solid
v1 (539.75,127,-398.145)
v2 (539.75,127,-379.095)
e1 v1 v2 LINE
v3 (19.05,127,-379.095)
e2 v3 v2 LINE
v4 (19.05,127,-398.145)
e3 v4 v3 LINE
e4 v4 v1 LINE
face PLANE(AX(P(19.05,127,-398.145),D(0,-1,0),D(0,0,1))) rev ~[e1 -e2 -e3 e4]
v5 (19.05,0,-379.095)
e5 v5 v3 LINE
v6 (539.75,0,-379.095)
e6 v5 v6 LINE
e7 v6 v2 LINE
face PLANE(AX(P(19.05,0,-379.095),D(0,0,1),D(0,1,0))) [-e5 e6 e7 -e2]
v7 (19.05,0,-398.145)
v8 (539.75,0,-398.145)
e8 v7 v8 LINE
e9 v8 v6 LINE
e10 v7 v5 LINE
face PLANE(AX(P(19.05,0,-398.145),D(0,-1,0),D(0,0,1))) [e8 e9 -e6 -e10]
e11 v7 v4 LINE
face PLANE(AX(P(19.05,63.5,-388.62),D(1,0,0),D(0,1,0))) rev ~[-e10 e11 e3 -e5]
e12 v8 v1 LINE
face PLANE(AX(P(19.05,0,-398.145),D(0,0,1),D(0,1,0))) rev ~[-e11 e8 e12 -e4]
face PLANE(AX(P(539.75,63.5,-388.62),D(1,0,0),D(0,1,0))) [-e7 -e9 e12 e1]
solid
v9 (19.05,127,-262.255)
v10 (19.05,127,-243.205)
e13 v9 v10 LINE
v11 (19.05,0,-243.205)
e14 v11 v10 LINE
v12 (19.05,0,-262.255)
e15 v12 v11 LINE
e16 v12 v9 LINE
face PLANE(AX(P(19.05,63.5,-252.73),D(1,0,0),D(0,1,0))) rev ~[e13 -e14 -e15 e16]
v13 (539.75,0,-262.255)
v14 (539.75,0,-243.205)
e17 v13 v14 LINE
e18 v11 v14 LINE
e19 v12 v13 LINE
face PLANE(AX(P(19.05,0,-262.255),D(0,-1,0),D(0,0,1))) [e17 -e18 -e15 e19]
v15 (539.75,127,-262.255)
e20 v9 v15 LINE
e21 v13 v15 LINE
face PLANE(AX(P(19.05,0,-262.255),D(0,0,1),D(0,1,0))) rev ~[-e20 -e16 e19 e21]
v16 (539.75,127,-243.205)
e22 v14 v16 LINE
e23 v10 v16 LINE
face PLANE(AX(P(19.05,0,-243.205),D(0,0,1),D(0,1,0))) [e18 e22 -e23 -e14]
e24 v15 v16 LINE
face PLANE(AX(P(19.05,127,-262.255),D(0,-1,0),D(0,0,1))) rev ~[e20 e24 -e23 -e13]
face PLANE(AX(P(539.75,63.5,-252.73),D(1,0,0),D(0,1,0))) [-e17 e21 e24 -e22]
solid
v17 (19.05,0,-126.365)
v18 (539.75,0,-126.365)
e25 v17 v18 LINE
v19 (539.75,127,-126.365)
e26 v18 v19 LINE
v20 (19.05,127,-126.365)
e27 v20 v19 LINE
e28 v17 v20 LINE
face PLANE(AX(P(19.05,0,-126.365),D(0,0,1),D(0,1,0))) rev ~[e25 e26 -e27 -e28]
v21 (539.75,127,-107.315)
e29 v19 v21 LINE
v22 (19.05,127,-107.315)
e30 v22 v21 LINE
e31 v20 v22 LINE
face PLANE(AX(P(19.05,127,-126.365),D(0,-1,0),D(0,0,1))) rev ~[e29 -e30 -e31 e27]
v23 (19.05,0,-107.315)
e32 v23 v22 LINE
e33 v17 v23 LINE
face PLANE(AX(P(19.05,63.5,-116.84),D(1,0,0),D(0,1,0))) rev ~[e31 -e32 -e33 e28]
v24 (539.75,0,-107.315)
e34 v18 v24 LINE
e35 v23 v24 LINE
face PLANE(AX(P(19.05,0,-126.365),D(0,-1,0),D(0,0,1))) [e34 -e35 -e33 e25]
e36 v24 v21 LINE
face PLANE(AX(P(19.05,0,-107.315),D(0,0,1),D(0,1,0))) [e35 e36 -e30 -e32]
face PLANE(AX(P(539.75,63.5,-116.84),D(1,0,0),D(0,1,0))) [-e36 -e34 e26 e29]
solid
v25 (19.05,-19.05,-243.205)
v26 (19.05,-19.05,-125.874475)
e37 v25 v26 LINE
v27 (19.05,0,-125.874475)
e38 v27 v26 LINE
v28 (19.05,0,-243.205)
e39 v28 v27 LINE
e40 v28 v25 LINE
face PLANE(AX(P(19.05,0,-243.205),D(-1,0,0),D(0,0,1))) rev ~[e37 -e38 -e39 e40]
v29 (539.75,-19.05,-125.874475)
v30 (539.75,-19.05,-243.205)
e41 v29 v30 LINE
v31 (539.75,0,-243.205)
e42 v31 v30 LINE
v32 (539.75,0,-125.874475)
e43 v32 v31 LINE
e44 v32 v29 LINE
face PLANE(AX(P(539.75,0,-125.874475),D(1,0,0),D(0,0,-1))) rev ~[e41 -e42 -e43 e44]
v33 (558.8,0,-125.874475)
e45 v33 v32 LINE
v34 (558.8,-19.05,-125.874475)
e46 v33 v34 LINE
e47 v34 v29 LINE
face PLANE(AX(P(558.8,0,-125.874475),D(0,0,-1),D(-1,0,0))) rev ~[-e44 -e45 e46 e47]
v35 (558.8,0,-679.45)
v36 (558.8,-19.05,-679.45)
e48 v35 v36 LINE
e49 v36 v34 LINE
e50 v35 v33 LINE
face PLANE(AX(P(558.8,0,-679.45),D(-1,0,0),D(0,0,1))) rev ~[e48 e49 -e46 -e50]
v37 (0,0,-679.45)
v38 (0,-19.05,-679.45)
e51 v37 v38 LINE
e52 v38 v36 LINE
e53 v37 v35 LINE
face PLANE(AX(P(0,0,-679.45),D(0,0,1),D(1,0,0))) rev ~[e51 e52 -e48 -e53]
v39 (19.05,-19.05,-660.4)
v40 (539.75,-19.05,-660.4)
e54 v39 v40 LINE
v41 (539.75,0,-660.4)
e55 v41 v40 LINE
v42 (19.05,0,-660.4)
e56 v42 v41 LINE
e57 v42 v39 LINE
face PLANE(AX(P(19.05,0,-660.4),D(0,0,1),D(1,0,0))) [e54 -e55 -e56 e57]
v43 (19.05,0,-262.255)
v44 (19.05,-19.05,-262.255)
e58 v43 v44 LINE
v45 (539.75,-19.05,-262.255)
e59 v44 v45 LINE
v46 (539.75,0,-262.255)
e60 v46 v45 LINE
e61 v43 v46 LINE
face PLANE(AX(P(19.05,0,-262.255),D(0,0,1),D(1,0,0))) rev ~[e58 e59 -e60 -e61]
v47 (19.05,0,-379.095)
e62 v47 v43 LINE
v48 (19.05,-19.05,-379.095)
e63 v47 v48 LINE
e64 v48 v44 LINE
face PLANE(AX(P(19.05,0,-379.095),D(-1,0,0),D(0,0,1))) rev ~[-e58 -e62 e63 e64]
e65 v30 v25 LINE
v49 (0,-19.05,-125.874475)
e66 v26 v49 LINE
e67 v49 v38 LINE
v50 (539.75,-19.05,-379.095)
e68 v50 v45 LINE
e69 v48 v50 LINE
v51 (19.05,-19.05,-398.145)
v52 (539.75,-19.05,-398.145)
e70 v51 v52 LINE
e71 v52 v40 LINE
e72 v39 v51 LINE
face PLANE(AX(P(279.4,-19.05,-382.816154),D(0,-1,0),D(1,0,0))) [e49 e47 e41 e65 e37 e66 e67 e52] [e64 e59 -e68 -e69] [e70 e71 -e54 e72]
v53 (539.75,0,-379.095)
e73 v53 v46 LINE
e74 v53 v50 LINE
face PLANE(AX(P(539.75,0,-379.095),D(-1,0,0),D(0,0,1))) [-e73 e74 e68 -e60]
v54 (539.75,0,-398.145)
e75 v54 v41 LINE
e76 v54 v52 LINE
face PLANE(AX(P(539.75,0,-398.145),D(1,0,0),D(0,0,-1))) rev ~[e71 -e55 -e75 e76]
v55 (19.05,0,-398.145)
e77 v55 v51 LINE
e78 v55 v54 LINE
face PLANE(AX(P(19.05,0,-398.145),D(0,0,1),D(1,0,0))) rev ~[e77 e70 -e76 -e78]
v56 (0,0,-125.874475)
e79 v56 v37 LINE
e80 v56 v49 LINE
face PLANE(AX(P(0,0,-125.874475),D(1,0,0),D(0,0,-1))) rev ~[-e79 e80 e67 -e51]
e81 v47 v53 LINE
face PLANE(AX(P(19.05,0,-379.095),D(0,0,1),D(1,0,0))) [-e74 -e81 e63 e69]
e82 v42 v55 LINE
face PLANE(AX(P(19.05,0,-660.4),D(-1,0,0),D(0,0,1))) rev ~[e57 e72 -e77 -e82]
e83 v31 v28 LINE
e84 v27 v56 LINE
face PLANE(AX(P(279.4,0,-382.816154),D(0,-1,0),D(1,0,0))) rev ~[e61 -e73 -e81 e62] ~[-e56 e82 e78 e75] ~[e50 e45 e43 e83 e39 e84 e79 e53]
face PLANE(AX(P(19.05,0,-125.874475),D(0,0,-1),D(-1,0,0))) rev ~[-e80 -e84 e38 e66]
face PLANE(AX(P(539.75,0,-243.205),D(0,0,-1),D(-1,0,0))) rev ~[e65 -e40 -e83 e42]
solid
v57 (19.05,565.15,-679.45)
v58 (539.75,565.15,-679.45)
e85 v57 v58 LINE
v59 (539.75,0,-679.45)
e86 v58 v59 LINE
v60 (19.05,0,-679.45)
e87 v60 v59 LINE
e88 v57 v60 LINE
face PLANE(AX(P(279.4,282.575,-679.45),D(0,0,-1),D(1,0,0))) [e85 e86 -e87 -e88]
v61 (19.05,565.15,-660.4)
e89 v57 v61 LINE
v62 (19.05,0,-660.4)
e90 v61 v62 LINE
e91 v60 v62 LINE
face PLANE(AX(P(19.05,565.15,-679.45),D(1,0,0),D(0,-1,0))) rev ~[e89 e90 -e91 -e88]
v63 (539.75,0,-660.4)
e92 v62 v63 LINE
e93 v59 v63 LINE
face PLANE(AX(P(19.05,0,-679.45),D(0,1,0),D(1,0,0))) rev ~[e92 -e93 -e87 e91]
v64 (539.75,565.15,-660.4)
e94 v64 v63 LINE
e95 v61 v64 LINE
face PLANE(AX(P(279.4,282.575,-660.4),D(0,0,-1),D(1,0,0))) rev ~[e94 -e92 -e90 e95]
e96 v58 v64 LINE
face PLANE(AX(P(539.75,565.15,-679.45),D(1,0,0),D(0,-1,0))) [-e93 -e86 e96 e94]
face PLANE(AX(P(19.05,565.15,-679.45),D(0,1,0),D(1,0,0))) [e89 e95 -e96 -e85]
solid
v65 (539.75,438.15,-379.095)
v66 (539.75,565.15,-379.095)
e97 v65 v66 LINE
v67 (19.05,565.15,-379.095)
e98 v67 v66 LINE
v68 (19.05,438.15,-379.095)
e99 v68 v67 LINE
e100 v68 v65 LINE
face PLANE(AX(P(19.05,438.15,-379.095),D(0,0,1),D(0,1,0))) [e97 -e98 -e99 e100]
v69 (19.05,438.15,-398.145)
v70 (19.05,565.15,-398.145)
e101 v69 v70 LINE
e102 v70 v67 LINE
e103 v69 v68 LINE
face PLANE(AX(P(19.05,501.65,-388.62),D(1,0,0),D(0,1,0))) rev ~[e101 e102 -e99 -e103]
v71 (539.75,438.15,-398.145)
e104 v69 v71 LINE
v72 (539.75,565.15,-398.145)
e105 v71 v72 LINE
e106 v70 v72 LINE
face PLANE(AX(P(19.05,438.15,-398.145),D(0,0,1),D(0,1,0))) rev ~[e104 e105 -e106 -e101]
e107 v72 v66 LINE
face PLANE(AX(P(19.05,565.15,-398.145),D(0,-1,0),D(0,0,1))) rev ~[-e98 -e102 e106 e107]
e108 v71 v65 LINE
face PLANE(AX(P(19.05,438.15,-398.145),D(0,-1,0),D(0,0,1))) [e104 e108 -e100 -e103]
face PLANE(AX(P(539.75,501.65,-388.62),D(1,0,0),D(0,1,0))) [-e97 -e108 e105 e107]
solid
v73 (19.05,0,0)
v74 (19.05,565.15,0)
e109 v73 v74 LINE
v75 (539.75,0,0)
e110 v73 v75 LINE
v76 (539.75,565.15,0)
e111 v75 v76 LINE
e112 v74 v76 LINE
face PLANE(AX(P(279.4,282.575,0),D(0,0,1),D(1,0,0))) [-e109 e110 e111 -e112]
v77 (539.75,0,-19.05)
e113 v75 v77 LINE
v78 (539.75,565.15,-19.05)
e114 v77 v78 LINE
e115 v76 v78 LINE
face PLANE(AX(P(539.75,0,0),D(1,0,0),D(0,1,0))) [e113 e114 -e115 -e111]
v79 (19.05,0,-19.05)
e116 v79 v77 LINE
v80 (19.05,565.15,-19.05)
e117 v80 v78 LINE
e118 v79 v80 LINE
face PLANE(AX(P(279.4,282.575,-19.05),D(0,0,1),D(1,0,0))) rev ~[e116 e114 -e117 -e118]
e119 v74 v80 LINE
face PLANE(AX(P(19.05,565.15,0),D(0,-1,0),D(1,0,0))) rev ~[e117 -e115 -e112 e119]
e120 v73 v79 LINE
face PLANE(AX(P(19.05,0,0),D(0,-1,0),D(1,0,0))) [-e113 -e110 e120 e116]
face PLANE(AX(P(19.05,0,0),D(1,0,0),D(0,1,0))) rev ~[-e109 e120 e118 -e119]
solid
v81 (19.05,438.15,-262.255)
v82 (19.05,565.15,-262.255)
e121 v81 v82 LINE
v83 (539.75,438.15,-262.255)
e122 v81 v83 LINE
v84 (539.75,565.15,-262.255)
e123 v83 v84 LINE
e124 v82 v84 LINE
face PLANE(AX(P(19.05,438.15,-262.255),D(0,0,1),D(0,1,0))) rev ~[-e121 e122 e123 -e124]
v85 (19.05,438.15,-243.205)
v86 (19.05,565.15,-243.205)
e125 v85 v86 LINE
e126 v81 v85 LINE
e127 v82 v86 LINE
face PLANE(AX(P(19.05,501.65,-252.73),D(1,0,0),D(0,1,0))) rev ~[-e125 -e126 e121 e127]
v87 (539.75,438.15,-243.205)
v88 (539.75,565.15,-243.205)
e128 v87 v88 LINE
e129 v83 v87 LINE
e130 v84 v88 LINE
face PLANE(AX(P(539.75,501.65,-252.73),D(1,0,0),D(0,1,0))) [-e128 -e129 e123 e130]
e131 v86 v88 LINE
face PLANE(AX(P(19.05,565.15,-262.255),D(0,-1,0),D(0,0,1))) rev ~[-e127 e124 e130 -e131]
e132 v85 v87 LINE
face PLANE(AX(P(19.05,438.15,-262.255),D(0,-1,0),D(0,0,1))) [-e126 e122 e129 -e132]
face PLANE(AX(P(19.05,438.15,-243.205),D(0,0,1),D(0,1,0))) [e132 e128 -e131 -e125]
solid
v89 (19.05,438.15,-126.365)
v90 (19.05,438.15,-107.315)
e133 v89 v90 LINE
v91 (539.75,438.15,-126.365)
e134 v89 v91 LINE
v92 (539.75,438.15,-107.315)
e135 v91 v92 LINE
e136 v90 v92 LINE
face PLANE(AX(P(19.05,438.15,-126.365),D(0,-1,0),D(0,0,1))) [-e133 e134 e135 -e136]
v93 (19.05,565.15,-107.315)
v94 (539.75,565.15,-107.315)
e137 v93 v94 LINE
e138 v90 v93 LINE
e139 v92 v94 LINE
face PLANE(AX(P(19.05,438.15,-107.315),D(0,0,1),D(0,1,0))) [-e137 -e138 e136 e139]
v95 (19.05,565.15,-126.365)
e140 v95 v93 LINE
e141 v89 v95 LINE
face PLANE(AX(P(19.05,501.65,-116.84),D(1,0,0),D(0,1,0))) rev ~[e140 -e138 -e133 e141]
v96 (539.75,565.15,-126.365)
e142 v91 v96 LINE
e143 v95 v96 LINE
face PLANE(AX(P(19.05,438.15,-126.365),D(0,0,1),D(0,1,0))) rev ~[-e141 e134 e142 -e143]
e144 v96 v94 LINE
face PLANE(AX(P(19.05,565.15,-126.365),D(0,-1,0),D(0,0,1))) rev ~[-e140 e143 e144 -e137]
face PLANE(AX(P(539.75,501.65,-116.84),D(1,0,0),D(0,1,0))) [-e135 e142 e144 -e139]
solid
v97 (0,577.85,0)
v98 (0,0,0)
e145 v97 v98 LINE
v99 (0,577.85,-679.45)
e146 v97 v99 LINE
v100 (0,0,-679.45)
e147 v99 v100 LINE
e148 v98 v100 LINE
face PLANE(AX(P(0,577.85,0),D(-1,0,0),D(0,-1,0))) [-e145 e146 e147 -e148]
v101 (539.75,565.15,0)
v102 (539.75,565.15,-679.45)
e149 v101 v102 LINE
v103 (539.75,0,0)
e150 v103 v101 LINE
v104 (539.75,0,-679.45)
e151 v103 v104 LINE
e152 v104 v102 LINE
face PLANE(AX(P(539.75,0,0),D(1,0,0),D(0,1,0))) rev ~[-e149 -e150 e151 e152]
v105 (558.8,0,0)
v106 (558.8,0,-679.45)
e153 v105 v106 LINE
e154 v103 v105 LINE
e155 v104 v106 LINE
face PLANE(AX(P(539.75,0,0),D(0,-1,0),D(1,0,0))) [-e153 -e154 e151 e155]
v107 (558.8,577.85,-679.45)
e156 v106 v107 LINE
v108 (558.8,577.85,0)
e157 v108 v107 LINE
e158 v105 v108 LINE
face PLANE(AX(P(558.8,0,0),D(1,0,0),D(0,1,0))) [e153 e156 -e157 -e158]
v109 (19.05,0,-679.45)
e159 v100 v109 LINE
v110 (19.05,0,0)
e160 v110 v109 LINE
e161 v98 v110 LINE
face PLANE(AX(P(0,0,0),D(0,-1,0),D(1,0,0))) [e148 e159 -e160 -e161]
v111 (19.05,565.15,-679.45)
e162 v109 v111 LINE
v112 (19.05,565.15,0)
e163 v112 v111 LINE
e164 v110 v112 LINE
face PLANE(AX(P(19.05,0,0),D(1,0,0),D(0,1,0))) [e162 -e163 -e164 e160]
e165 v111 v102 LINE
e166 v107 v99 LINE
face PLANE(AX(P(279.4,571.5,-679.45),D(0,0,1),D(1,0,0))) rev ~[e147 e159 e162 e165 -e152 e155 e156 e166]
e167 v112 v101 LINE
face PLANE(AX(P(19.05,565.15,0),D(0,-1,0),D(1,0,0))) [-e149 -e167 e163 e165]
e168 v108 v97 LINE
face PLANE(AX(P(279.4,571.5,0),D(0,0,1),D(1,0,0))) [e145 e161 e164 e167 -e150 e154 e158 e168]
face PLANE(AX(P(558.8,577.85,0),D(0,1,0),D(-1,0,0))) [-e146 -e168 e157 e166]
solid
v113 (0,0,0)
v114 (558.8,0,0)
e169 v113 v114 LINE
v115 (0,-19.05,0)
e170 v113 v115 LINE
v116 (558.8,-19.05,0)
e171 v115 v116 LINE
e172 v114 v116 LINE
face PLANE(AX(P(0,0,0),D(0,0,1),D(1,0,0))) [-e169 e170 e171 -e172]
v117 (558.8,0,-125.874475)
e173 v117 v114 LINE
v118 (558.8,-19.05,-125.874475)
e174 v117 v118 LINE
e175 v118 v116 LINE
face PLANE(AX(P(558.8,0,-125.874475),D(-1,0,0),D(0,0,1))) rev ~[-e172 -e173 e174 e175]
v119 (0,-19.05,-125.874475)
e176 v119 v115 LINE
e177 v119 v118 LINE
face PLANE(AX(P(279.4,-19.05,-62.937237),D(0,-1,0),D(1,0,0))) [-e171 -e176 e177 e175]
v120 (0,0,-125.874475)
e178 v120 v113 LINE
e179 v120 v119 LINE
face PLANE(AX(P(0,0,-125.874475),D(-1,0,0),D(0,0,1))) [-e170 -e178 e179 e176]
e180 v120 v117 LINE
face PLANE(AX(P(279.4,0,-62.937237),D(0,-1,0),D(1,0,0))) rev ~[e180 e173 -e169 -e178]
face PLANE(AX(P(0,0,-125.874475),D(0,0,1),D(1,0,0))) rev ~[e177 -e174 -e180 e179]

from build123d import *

# Parameters (mm, degrees)
F4_W      = 19.05
F4_H      = 565.15
F5_DEPTH  = 679.45
F6_W      = 520.7
F6_H      = 565.15
F7_DEPTH  = 19.05
F8_W      = 520.7
F8_H      = 565.15
F9_DEPTH  = 19.05
F10_W     = 558.8
F10_H     = 135.73125
F11_DEPTH = 19.05
F12_W     = 520.7
F12_H     = 19.05
F13_DEPTH = 565.15
F15_DEPTH = 19.05
F19_W     = 127
F19_H     = 19.05
F20_DEPTH = 520.7
F21_W     = 558.8
F21_H     = 125.8744746447
F22_DEPTH = 19.05
F23_W     = 263.5020315647
F23_H     = 73.9188790321
F24_DEPTH = 19.05
F25_W     = 520.7
F25_H     = 116.84
F25_H_2   = 19.05
F26_DEPTH = 19.05


# Not quite as in the source:
# - a variable given as a bare number and used for a length is read in inches; the dataset says mm whatever the document's units were


with BuildPart() as f5:
    # F4 (on Top) → F5 (new body)
    with BuildSketch(Plane.XY):
        Polygon((558.8, 577.85), (0, 577.85), (0, 565.15), (19.05, 565.15), (539.75, 565.15), (558.8, 565.15), align=None)
        with Locations((9.525, 282.575)):
            Rectangle(F4_W, F4_H)
        with Locations((549.275, 282.575)):
            Rectangle(F4_W, F4_H)
    extrude(amount=-F5_DEPTH)


with BuildPart() as f7:
    # F6 (on Top) → F7 (new body)
    with BuildSketch(Plane.XY):
        with Locations((279.4, 282.575)):
            Rectangle(F6_W, F6_H)
    extrude(amount=-F7_DEPTH)


with BuildPart() as f9:
    # F8 (on face) → F9 (new body)
    with BuildSketch(Plane(origin=(0, 0, -679.45), x_dir=(1, 0, 0), z_dir=(0, 0, -1))):
        with Locations((279.4, -282.575)):
            Rectangle(F8_W, F8_H)
    extrude(amount=-F9_DEPTH)


with BuildPart() as f11:
    # F10 (on face) → F11 (new body)
    with BuildSketch(Plane.XZ):
        with Locations((279.4, -67.865625)):
            Rectangle(F10_W, F10_H)
    extrude(amount=F11_DEPTH)


with BuildPart() as f13:
    # F12 (on face) → F13 (new body)
    with BuildSketch(Plane.XZ.offset(-565.15)):
        with Locations((279.4, -349.25)):
            Rectangle(F12_W, F12_H)
    extrude(amount=F13_DEPTH)


with BuildPart() as f15:
    # F14 (on face) → F15 (new body)
    with BuildSketch(Plane.XZ):
        Polygon((558.8, -135.73125), (539.75, -135.73125), (539.75, -339.725), (539.75, -358.775), (539.75, -660.4), (539.75, -679.45), (558.8, -679.45), align=None)
        Polygon((539.75, -358.775), (539.75, -339.725), (19.05, -339.725), (19.05, -135.73125), (0, -135.73125), (0, -679.45), (19.05, -679.45), (539.75, -679.45), (539.75, -660.4), (19.05, -660.4), (19.05, -358.775), align=None)
    extrude(amount=F15_DEPTH)


with BuildPart() as f20:
    # F19 (on face) → F20 (new body, through all)
    with BuildSketch(Plane.YZ.offset(19.05)):
        with Locations((501.65, -116.84)):
            Rectangle(F19_W, F19_H)
    extrude(amount=F20_DEPTH)


with BuildPart() as f20b:
    # F19 (on face) → F20, piece 2 (new body, through all)
    with BuildSketch(Plane.YZ.offset(19.05)):
        with Locations((63.5, -116.84)):
            Rectangle(F19_W, F19_H)
    extrude(amount=F20_DEPTH)


with BuildPart() as f20c:
    # F19 (on face) → F20, piece 3 (new body, through all)
    with BuildSketch(Plane.YZ.offset(19.05)):
        with Locations((63.5, -252.73)):
            Rectangle(F19_W, F19_H)
    extrude(amount=F20_DEPTH)


with BuildPart() as f20d:
    # F19 (on face) → F20, piece 4 (new body, through all)
    with BuildSketch(Plane.YZ.offset(19.05)):
        with Locations((501.65, -252.73)):
            Rectangle(F19_W, F19_H)
    extrude(amount=F20_DEPTH)


with BuildPart() as f20e:
    # F19 (on face) → F20, piece 5 (new body, through all)
    with BuildSketch(Plane.YZ.offset(19.05)):
        with Locations((63.5, -388.62)):
            Rectangle(F19_W, F19_H)
    extrude(amount=F20_DEPTH)


with BuildPart() as f20f:
    # F19 (on face) → F20, piece 6 (new body, through all)
    with BuildSketch(Plane.YZ.offset(19.05)):
        with Locations((501.65, -388.62)):
            Rectangle(F19_W, F19_H)
    extrude(amount=F20_DEPTH)


with BuildPart() as f22:
    # F21 (on Front) → F22 (new body)
    with BuildSketch(Plane.XZ):
        with Locations((279.4, -62.9372373223)):
            Rectangle(F21_W, F21_H)
    extrude(amount=F22_DEPTH)


with BuildPart() as f24:
    # F23 (on Front) → F24 (new body)
    with BuildSketch(Plane.XZ):
        with Locations((339.2337411642, -197.9473680258)):
            Rectangle(F23_W, F23_H)
    extrude(amount=F24_DEPTH)


with BuildPart() as f26:
    # F25 (on face) → F26 (new body)
    with BuildSketch(Plane.XZ):
        Polygon((19.05, -125.8744746447), (0, -125.8744746447), (0, -679.45), (19.05, -679.45), (19.05, -660.4), (19.05, -398.145), (539.75, -398.145), (539.75, -660.4), (539.75, -679.45), (558.8, -679.45), (558.8, -125.8744746447), (539.75, -125.8744746447), (539.75, -243.205), (19.05, -243.205), align=None)
        with Locations((279.4, -320.675)):
            Rectangle(F25_W, F25_H, mode=Mode.SUBTRACT)
        with Locations((279.4, -669.925)):
            Rectangle(F25_W, F25_H_2)
    extrude(amount=F26_DEPTH)


solid = Compound([f5.part, f7.part, f9.part, f20.part, f20b.part, f20c.part, f20d.part, f20e.part, f20f.part, f22.part, f26.part])
